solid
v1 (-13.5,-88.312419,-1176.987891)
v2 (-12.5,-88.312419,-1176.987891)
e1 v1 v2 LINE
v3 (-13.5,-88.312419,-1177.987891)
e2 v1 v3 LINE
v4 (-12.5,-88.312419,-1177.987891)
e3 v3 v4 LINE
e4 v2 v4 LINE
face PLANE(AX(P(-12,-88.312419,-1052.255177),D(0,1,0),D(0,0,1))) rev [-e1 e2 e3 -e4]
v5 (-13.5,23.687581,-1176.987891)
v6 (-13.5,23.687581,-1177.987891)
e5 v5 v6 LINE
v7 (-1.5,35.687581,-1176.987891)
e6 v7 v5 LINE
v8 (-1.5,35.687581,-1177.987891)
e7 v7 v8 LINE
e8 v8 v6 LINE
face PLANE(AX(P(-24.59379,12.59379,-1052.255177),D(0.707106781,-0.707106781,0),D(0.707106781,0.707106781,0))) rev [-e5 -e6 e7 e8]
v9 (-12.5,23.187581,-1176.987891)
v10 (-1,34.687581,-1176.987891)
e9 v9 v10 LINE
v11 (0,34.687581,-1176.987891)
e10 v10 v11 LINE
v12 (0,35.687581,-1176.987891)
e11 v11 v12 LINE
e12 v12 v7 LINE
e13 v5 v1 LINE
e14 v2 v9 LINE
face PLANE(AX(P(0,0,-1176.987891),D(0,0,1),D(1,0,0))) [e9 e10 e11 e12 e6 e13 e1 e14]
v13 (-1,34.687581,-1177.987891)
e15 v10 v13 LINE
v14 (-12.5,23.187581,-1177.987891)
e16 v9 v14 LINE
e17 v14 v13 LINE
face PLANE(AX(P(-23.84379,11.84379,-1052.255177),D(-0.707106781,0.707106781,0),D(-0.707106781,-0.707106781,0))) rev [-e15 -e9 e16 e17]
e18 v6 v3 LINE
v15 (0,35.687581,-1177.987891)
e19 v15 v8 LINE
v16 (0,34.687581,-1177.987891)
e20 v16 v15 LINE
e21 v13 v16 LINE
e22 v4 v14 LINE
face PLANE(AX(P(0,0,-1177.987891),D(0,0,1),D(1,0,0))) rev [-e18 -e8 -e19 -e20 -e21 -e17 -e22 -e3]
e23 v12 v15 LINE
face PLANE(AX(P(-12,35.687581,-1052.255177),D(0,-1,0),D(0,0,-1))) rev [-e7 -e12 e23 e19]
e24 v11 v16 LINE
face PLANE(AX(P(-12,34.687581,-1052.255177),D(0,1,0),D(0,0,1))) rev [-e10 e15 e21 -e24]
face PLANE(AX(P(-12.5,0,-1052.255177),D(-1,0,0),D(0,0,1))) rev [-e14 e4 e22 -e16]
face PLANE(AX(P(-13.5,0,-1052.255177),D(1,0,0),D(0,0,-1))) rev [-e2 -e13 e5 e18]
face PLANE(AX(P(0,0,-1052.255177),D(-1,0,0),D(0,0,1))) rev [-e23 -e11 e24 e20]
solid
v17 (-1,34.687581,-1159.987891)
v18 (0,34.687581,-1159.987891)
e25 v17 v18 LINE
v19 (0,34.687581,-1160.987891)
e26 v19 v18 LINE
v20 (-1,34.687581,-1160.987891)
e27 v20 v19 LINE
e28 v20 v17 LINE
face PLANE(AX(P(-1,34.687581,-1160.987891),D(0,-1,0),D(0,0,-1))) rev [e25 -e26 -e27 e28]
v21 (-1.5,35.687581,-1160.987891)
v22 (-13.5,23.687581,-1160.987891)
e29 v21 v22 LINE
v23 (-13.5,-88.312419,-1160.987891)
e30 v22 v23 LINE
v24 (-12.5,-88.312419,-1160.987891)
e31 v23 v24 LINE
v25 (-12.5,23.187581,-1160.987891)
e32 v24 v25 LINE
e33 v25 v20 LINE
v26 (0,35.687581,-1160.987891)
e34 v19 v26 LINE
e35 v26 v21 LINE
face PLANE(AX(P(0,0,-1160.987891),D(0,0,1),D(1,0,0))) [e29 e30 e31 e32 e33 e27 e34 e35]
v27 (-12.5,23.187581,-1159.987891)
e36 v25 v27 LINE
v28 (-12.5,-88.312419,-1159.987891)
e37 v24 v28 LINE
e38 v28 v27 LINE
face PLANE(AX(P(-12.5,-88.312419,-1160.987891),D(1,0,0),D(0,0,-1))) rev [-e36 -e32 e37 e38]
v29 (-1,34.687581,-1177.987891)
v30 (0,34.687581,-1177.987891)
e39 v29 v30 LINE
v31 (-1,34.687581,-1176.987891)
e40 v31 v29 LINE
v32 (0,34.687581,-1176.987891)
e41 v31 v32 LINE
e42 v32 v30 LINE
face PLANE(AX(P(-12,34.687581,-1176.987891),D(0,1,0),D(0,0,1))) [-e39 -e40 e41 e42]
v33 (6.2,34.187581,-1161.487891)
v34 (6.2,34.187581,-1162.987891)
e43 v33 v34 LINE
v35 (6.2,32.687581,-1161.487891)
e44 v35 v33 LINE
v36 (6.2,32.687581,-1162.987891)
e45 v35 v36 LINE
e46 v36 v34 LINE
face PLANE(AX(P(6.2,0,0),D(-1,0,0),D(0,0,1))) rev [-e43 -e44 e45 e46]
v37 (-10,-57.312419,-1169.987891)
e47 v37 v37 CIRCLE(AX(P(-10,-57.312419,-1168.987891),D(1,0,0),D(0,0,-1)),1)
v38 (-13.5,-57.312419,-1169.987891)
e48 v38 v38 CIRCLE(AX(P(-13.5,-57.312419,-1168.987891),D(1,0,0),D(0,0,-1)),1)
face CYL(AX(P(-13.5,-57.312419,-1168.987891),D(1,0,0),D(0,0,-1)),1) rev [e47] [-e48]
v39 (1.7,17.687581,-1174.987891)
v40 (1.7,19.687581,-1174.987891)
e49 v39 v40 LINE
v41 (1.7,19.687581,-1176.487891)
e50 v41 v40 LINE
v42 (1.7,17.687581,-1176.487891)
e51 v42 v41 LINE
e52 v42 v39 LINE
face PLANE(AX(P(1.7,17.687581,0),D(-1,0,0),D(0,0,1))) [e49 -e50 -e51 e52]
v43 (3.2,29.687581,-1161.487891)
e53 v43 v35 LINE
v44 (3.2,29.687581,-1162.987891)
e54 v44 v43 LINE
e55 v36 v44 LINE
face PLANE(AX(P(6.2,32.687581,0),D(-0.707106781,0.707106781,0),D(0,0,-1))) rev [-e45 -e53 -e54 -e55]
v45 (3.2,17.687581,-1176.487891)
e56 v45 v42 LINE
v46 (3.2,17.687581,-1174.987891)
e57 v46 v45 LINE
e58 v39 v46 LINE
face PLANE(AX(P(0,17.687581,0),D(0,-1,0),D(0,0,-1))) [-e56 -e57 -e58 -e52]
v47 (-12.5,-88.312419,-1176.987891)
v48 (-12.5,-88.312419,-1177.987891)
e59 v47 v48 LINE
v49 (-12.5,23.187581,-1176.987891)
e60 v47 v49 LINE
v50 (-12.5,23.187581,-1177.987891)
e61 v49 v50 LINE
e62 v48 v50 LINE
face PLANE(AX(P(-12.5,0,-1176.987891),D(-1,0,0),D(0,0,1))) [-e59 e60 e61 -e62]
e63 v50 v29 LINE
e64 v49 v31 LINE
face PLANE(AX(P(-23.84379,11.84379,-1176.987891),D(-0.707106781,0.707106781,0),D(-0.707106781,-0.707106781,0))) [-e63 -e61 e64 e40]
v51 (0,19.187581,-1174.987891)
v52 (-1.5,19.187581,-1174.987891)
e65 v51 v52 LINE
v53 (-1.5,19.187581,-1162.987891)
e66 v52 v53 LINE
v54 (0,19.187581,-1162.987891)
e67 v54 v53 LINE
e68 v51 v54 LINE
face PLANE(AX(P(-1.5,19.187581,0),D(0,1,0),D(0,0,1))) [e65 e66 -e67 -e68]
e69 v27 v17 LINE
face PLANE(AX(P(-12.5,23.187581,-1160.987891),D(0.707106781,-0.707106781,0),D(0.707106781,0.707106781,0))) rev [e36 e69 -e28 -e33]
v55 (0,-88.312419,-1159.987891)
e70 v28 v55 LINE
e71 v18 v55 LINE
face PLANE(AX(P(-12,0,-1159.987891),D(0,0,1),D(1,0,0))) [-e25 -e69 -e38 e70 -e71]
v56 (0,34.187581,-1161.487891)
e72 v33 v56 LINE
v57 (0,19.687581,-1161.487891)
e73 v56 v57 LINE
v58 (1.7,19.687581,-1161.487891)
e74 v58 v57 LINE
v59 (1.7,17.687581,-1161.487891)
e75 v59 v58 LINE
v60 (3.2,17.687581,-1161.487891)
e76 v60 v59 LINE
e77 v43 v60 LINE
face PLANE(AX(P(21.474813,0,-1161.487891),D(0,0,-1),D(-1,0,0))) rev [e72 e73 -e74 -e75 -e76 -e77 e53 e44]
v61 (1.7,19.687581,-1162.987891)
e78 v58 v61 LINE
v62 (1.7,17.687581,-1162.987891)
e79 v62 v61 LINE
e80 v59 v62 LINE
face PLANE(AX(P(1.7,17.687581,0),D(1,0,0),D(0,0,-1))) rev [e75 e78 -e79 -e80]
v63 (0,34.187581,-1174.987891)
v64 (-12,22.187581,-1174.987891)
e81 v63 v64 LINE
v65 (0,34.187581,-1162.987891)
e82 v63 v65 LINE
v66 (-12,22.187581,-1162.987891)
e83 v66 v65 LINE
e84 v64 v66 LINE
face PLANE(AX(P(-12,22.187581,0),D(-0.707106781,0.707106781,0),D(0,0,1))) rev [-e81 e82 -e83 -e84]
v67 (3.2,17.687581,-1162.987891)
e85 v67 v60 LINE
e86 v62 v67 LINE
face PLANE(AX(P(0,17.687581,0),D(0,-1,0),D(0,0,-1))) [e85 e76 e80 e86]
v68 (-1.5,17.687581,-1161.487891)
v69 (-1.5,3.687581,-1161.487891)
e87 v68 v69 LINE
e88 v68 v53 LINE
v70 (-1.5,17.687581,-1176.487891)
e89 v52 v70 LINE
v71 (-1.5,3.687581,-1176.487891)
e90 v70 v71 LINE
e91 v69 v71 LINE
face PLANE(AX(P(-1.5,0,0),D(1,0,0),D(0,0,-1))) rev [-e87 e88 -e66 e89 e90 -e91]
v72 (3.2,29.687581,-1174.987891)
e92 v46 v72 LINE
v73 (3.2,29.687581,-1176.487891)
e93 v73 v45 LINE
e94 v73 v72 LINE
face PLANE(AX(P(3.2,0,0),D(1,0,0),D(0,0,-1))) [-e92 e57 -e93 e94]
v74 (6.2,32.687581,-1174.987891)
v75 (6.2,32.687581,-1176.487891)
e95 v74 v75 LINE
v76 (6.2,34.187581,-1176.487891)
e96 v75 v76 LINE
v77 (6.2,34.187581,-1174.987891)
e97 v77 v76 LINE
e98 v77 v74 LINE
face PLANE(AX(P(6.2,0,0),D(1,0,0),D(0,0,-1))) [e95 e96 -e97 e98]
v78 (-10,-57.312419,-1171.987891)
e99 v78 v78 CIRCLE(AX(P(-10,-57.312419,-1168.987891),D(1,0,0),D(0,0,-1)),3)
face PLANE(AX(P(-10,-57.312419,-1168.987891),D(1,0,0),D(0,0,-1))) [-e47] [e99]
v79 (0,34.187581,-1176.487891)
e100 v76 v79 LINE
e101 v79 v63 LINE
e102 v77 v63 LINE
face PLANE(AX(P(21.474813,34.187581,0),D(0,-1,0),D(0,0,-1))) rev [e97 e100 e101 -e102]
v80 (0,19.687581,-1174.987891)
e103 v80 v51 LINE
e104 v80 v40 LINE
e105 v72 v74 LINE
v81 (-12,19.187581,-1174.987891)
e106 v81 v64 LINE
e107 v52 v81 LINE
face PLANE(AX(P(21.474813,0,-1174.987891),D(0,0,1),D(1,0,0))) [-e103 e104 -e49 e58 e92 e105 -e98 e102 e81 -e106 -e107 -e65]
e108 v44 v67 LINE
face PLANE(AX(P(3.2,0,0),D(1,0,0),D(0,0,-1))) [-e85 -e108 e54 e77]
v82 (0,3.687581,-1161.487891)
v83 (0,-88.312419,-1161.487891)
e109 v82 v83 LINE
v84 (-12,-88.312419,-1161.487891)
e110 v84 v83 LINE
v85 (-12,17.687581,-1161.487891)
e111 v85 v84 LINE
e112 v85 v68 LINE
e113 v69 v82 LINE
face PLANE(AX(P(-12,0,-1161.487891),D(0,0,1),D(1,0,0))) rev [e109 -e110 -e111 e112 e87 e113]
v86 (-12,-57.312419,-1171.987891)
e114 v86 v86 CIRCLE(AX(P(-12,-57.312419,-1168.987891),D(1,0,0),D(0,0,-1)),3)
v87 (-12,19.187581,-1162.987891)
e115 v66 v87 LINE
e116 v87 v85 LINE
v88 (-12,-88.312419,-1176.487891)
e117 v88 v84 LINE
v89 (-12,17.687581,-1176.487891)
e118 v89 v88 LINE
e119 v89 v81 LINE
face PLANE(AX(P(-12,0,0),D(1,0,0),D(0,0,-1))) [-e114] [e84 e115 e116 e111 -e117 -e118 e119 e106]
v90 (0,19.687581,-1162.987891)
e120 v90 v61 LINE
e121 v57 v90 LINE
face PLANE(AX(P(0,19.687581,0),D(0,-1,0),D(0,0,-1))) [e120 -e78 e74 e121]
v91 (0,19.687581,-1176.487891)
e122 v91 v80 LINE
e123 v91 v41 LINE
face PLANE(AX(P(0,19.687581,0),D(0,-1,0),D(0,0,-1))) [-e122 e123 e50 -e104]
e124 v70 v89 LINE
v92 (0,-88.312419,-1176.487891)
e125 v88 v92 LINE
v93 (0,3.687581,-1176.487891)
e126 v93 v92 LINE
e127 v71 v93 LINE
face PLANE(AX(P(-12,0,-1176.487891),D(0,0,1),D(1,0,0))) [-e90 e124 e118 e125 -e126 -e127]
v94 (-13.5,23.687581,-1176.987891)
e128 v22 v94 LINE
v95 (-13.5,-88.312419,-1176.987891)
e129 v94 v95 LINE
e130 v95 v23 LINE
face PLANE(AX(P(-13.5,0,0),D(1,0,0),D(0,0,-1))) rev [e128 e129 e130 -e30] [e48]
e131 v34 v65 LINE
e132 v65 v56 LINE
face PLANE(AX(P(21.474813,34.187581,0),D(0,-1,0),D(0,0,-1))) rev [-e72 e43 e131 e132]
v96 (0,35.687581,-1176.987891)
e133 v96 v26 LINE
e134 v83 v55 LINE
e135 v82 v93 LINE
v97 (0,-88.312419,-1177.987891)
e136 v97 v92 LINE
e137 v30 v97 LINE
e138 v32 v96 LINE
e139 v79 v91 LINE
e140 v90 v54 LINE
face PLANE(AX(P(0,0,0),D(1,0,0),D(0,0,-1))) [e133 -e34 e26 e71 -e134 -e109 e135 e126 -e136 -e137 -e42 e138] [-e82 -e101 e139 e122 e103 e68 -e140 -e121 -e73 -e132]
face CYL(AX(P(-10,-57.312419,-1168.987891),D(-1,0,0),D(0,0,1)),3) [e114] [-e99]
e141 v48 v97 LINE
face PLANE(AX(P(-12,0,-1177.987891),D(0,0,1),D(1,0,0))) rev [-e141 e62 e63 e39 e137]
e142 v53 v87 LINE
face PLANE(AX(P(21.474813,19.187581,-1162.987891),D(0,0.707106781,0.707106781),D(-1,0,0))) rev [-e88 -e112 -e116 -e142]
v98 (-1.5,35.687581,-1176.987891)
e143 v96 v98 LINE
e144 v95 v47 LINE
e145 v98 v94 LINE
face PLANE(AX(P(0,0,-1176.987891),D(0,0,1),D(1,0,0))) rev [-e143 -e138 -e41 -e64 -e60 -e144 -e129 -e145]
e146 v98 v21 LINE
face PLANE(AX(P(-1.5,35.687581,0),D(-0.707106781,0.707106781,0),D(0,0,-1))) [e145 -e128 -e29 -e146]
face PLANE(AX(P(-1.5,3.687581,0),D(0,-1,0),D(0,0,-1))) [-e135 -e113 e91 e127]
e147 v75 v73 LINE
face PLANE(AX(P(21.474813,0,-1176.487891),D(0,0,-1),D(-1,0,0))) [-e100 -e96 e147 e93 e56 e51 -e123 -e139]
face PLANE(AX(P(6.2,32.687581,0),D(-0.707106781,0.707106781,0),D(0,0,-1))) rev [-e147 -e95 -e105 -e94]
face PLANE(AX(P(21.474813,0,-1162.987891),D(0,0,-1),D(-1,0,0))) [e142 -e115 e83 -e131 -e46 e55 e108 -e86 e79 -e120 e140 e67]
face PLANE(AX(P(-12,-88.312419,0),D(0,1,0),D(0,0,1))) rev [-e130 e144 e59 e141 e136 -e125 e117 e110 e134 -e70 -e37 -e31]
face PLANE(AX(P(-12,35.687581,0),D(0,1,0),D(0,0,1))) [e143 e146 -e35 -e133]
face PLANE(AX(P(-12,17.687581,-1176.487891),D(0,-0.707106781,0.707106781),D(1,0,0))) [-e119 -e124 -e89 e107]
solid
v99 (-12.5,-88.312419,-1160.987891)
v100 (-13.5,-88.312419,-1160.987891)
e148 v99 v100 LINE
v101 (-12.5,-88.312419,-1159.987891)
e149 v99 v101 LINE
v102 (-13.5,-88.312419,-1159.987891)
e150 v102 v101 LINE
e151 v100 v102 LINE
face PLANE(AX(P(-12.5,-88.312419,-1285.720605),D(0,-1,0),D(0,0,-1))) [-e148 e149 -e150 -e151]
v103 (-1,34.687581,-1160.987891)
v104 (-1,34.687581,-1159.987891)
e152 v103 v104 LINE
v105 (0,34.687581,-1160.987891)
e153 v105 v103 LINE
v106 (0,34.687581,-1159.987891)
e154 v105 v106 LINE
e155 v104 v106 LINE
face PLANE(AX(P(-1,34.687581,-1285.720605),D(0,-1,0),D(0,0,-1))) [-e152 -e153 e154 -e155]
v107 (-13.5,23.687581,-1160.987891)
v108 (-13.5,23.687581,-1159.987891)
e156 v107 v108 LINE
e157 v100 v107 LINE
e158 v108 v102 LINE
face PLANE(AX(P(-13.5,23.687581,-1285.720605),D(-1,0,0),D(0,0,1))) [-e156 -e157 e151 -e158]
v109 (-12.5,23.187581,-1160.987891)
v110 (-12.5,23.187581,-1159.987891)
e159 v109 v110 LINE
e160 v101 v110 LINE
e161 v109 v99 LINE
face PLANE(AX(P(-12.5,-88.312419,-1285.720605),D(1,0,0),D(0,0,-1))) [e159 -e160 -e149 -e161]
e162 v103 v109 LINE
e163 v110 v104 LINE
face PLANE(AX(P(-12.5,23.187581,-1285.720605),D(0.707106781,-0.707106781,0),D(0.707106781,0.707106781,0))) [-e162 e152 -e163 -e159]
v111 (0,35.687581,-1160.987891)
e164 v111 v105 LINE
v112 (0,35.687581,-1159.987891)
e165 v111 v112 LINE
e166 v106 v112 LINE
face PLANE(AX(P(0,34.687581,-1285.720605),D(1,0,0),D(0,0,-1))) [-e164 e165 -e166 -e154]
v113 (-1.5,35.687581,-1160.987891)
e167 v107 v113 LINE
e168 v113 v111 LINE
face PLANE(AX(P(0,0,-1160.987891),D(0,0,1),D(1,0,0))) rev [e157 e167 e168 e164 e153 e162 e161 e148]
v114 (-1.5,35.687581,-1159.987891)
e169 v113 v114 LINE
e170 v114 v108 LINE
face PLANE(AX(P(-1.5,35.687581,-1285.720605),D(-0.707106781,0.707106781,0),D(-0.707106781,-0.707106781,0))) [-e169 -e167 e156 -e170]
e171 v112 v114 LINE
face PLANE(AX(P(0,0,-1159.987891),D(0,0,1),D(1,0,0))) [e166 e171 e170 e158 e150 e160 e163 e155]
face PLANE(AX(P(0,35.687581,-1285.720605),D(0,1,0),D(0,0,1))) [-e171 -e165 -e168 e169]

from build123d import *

# Parameters (mm, degrees)
SKETCH1_W            = 1.5
SKETCH1_H            = 92
BOSS_EXTRUDE1_DEPTH  = 12
BOSS_EXTRUDE5_DEPTH  = 1.5
BOSS_EXTRUDE6_START  = 12
SKETCH1_7_W          = 1.5
SKETCH1_7_H          = 15
BOSS_EXTRUDE6_DEPTH  = 15.2
BOSS_EXTRUDE3_START  = 12
SKETCH1_4_W          = 18
SKETCH1_4_H          = 124
SKETCH1_4_R          = 1
BOSS_EXTRUDE3_DEPTH  = 1.5
BOSS_EXTRUDE4_START  = 10
SKETCH1_5_R          = 3
SKETCH1_5_R_2        = 1
BOSS_EXTRUDE4_DEPTH  = 2
BOSS_EXTRUDE12_START = -3.2
SKETCH1_9_W          = 1.5
SKETCH1_9_H          = 1.5
BOSS_EXTRUDE12_DEPTH = 3
SKETCH4_W            = 1.5
SKETCH4_H            = 1.5
BOSS_EXTRUDE10_DEPTH = 1.5
SKETCH4_4_W          = 1.7
SKETCH4_4_H          = 1.5
CUT_EXTRUDE5_DEPTH   = 0.5
CHAMFER1_SIZE        = 12
CHAMFER2_SIZE        = 1.5
CUT_EXTRUDE1_START   = -1
CUT_EXTRUDE1_DEPTH   = 1
CUT_EXTRUDE2_START   = -18
CUT_EXTRUDE2_DEPTH   = 1
BOSS_EXTRUDE7_DEPTH  = 1
BOSS_EXTRUDE8_START  = -18
BOSS_EXTRUDE8_DEPTH  = 1
CHAMFER3_SIZE        = 3


# Read off the part's stored shape, not the designer's step: Cut-Extrude1, Cut-Extrude2
with BuildPart() as part:
    # Sketch1 → Boss-Extrude1 (new body)
    with BuildSketch(Plane.ZY):
        Polygon((-1176.487890925, 3.687580965), (-1176.487890925, 19.187580965), (-1176.487890925, 32.687580965), (-1176.487890925, 34.187580965), (-1174.987890925, 34.187580965), (-1162.987890925, 34.187580965), (-1161.487890925, 34.187580965), (-1161.487890925, 32.687580965), (-1161.487890925, 19.187580965), (-1161.487890925, 3.687580965), (-1159.987890925, 3.687580965), (-1159.987890925, 35.687580965), (-1177.987890925, 35.687580965), (-1177.987890925, 3.687580965), align=None)
        with Locations((-1160.737890925, -42.312419035)):
            Rectangle(SKETCH1_W, SKETCH1_H)
        with Locations((-1177.237890925, -42.312419035)):
            Rectangle(SKETCH1_W, SKETCH1_H)
    extrude(amount=BOSS_EXTRUDE1_DEPTH)

    # Sketch1<6> → Boss-Extrude5 (add)
    with BuildSketch(Plane.ZY):
        Polygon((-1174.987890925, 19.187580965), (-1176.487890925, 19.187580965), (-1176.487890925, 3.687580965), (-1161.487890925, 3.687580965), (-1161.487890925, 19.187580965), (-1162.987890925, 19.187580965), align=None)
    extrude(amount=BOSS_EXTRUDE5_DEPTH)

    # Sketch1<7> → Boss-Extrude6 (add)
    with BuildSketch(Plane.ZY.offset(BOSS_EXTRUDE6_START)):
        with Locations((-1175.737890925, 26.687580965)):
            Rectangle(SKETCH1_7_W, SKETCH1_7_H)
        with Locations((-1162.237890925, 26.687580965)):
            Rectangle(SKETCH1_7_W, SKETCH1_7_H)
    extrude(amount=-BOSS_EXTRUDE6_DEPTH)

    # Sketch1<4> → Boss-Extrude3 (add)
    with BuildSketch(Plane.ZY.offset(BOSS_EXTRUDE3_START)):
        with Locations((-1168.987890925, -26.312419035)):
            Rectangle(SKETCH1_4_W, SKETCH1_4_H)
        with Locations(Location((-1168.987890925, -57.312419035, 0), (0, 0, 180))):
            Circle(SKETCH1_4_R, mode=Mode.SUBTRACT)
    extrude(amount=BOSS_EXTRUDE3_DEPTH)

    # Sketch1<5> → Boss-Extrude4 (add)
    with BuildSketch(Plane.ZY.offset(BOSS_EXTRUDE4_START)):
        with Locations(Location((-1168.987890925, -57.312419035, 0), (0, 0, 180))):
            Circle(SKETCH1_5_R)
        with Locations(Location((-1168.987890925, -57.312419035, 0), (0, 0, 180))):
            Circle(SKETCH1_5_R_2, mode=Mode.SUBTRACT)
    extrude(amount=BOSS_EXTRUDE4_DEPTH)

    # Sketch1<9> → Boss-Extrude12 (add)
    with BuildSketch(Plane.ZY.offset(BOSS_EXTRUDE12_START)):
        with Locations((-1162.237890925, 33.437580965)):
            Rectangle(SKETCH1_9_W, SKETCH1_9_H)
        with Locations((-1175.737890925, 33.437580965)):
            Rectangle(SKETCH1_9_W, SKETCH1_9_H)
    extrude(amount=-BOSS_EXTRUDE12_DEPTH)

    # Sketch4 → Boss-Extrude10 (add)
    with BuildSketch(Plane.XZ.offset(-19.187580965)):
        with Locations((2.45, -1162.237890925)):
            Rectangle(SKETCH4_W, SKETCH4_H)
        with Locations((2.45, -1175.737890925)):
            Rectangle(SKETCH4_W, SKETCH4_H)
    extrude(amount=BOSS_EXTRUDE10_DEPTH)

    # Sketch4<4> → Cut-Extrude5 (cut)
    with BuildSketch(Plane.XZ.offset(-19.187580965)):
        with Locations((0.85, -1162.237890925)):
            Rectangle(SKETCH4_4_W, SKETCH4_4_H)
        with Locations((0.85, -1175.737890925)):
            Rectangle(SKETCH4_4_W, SKETCH4_4_H)
    extrude(amount=-CUT_EXTRUDE5_DEPTH, mode=Mode.SUBTRACT)

    # Chamfer1
    chamfer1_edges = [part.edges().sort_by_distance(p)[0] for p in [
        (-12, 34.187580965, -1168.987890925),
        (-13.5, 35.687580965, -1168.987890925),
    ]]
    chamfer(chamfer1_edges, length=CHAMFER1_SIZE - 0.0001)  # a hair under: the kernel refuses the full size

    # Chamfer2
    chamfer2_edges = [part.edges().sort_by_distance(p)[0] for p in [
        (-6.75, 19.187580965, -1176.487890925),
        (-6.75, 19.187580965, -1161.487890925),
    ]]
    chamfer(chamfer2_edges, length=CHAMFER2_SIZE - 0.0001)  # a hair under: the kernel refuses the full size

    # Cut-Extrude1 outline → Cut-Extrude1 (cut)
    with BuildSketch(Plane.XY.offset(-1159.987890925).offset(CUT_EXTRUDE1_START)):
        Polygon((-12.5, 23.187580965), (-1, 34.687580965), (1, 34.687580965), (1, 37), (-15, 37), (-15, -88.312419035), (-12.5, -88.312419035), align=None)
    extrude(amount=CUT_EXTRUDE1_DEPTH, mode=Mode.SUBTRACT)

    # Cut-Extrude2 outline → Cut-Extrude2 (cut)
    with BuildSketch(Plane.XY.offset(-1159.987890925).offset(CUT_EXTRUDE2_START)):
        Polygon((-1, 34.687580965), (1, 34.687580965), (1, 37), (-15, 37), (-15, -88.312419035), (-12.5, -88.312419035), (-12.5, 23.187580965), align=None)
    extrude(amount=CUT_EXTRUDE2_DEPTH, mode=Mode.SUBTRACT)

    # Chamfer3
    chamfer3_edges = [part.edges().sort_by_distance(p)[0] for p in [
        (3.2, 32.687580965, -1175.737890925),
        (3.2, 32.687580965, -1162.237890925),
    ]]
    chamfer(chamfer3_edges, length=CHAMFER3_SIZE - 0.0001)  # a hair under: the kernel refuses the full size


with BuildPart() as body_2:
    # Sketch2<2> → Boss-Extrude7 (new body)
    with BuildSketch(Plane.XY.offset(-1159.987890925)):
        Polygon((0, 35.687580965), (-1.5, 35.687580965), (-13.5, 23.687580965), (-13.5, -88.312419035), (-12.5, -88.312419035), (-12.5, 23.187580965), (-1, 34.687580965), (0, 34.687580965), align=None)
    extrude(amount=-BOSS_EXTRUDE7_DEPTH)


with BuildPart() as body_3:
    # Sketch2<5> → Boss-Extrude8 (new body)
    with BuildSketch(Plane.XY.offset(-1159.987890925).offset(BOSS_EXTRUDE8_START)):
        Polygon((0, 35.687580965), (-1.5, 35.687580965), (-13.5, 23.687580965), (-13.5, -88.312419035), (-12.5, -88.312419035), (-12.5, 23.187580965), (-1, 34.687580965), (0, 34.687580965), align=None)
    extrude(amount=BOSS_EXTRUDE8_DEPTH)


solid = Compound([part.part, body_2.part, body_3.part])
